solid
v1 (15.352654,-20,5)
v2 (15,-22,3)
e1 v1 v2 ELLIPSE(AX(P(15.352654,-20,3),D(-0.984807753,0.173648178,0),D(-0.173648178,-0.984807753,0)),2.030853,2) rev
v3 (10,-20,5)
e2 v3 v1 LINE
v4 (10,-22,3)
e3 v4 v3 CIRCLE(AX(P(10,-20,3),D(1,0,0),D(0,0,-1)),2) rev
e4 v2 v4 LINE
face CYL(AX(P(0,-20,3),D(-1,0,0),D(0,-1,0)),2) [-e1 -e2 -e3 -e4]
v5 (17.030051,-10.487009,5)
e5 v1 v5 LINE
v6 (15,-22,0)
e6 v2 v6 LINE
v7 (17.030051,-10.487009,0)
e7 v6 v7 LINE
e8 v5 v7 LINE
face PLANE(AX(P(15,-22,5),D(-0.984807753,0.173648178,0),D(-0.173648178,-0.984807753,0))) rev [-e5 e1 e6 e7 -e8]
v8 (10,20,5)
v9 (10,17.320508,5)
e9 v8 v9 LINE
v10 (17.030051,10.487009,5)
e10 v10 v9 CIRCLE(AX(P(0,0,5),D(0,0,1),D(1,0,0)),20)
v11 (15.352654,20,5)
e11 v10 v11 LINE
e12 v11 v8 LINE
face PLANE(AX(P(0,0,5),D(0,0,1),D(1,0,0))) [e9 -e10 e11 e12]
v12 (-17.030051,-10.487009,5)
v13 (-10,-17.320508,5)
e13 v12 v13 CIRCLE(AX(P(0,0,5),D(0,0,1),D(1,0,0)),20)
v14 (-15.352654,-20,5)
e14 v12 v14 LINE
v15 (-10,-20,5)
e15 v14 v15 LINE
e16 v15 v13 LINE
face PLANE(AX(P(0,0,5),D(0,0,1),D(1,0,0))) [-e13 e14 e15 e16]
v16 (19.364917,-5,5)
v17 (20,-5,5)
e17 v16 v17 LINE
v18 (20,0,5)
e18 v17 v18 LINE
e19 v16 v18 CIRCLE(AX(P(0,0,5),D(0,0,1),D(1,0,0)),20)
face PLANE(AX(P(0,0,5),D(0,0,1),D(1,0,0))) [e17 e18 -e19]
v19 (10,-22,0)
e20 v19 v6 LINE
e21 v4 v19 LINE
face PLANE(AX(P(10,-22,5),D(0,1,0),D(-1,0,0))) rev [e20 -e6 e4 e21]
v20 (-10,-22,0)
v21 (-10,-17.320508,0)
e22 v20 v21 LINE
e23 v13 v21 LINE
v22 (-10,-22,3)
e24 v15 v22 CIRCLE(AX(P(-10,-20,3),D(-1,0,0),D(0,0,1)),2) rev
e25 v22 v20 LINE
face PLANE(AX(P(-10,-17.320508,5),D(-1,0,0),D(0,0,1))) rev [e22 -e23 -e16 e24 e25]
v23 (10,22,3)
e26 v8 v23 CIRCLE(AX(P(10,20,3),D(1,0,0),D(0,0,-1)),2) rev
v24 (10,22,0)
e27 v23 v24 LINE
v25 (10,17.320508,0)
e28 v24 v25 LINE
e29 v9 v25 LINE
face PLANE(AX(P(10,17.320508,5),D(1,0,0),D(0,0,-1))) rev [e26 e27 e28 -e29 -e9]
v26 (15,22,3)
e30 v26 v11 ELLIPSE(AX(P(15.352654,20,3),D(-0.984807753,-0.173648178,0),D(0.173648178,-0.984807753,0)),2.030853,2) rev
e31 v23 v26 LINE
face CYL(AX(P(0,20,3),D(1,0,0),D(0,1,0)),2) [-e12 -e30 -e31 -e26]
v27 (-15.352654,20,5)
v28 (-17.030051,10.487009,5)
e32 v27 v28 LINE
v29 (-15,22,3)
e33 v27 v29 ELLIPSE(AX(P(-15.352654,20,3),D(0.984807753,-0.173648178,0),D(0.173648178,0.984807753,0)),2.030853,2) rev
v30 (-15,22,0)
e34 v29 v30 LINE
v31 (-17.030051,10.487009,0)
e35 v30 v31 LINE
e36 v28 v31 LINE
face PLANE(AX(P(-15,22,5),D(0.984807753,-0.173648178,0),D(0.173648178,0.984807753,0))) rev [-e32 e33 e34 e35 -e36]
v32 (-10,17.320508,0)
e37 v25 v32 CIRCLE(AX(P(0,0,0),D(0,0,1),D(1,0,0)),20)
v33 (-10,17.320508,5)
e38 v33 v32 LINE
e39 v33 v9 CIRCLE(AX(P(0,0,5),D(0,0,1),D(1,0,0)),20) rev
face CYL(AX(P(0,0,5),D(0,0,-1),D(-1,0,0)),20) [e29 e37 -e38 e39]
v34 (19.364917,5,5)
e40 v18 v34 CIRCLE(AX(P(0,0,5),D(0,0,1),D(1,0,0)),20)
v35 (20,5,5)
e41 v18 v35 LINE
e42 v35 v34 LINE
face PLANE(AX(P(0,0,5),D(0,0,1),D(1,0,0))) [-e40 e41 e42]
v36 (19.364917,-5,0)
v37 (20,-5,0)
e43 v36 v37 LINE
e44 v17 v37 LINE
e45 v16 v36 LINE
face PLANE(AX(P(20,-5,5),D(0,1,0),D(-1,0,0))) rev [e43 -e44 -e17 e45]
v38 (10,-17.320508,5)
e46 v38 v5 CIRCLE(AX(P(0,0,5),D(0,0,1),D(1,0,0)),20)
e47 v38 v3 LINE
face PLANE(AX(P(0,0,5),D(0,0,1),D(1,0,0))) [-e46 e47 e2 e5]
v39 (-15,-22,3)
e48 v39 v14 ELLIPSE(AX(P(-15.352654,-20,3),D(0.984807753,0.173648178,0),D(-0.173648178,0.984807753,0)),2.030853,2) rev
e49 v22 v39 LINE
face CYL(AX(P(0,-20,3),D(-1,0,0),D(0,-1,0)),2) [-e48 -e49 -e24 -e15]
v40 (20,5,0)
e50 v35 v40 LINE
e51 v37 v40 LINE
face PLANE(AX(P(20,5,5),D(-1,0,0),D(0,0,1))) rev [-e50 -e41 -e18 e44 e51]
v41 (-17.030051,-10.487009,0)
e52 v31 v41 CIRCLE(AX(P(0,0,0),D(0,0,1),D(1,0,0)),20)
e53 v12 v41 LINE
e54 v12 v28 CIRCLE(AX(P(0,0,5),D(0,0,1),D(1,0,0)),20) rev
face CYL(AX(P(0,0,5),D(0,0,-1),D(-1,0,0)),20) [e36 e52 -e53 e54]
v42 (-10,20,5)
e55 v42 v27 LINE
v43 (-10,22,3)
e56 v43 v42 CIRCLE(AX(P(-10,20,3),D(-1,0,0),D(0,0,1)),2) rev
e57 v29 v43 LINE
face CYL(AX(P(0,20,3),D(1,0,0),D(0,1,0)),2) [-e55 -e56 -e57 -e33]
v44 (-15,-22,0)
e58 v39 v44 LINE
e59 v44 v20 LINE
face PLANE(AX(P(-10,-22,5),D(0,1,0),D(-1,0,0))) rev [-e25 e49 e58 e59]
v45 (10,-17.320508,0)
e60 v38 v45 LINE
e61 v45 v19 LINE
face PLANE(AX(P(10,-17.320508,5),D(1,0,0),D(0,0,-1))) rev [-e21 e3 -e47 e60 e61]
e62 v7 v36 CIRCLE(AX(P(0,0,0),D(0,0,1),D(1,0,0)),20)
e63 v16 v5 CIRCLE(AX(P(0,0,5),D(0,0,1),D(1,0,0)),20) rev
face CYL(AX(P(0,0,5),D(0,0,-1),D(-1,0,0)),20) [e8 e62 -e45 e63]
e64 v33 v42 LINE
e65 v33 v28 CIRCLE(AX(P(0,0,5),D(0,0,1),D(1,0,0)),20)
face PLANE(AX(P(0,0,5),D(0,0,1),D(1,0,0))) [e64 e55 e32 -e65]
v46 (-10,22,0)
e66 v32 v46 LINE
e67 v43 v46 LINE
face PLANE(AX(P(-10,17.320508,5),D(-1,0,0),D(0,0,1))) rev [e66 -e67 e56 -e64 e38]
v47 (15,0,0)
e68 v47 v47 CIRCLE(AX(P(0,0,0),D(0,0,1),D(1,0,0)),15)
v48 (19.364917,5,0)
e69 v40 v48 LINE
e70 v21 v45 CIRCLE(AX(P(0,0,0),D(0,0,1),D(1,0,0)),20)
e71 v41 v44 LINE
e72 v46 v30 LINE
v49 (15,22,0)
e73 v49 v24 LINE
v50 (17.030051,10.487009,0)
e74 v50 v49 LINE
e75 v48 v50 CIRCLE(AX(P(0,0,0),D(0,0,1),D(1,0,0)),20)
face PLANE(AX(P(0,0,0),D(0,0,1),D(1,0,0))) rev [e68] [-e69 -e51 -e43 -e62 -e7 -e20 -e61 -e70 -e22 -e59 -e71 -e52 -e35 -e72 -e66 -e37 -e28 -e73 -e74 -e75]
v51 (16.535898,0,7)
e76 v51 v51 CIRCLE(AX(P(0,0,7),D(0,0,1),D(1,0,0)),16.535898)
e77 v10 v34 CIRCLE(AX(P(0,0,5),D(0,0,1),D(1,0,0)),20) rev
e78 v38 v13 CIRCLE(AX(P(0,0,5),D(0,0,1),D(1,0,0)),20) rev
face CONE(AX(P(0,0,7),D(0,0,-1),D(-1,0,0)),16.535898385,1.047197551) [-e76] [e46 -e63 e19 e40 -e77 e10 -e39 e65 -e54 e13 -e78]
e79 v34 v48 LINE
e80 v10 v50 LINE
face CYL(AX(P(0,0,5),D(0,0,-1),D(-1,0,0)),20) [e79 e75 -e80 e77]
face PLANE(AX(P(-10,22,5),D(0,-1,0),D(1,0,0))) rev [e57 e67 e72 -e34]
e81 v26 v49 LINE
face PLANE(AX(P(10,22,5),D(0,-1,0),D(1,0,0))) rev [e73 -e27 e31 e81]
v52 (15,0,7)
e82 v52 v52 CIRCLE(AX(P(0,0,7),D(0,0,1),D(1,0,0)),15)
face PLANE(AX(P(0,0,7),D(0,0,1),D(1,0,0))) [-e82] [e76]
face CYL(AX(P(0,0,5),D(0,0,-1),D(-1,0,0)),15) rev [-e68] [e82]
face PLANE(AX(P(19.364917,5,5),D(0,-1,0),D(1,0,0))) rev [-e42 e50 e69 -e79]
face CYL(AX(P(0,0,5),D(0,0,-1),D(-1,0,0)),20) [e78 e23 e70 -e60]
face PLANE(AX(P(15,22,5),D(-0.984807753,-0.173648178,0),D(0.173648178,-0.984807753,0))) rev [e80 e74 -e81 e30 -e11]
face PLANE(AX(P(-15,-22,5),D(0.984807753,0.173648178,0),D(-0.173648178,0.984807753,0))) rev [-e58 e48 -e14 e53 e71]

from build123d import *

# Parameters (mm, degrees)
ESQUISSE1_R        = 15
BOSS_EXTRU_1_DEPTH = 5
ESQUISSE5_R        = 20
ESQUISSE5_R_2      = 15
BOSS_EXTRU_2_DEPTH = 2
CHANFREIN2_SIZE    = 2
CHANFREIN2_SIZE_2  = 3.464101615
CONG_1_R           = 2


with BuildPart() as part:
    # Esquisse1 → Boss.-Extru.1 (new body)
    with BuildSketch(Plane.XY):
        with BuildLine():
            Line((-10, 17.320508076), (-10, 22))
            Line((-10, 22), (-15, 22))
            Line((-15, 22), (-17.030050858, 10.487009478))
            ThreePointArc((-17.030050858, 10.487009478), (-20, 0), (-17.030050858, -10.487009478))
            Line((-17.030050858, -10.487009478), (-15, -22))
            Line((-15, -22), (-10, -22))
            Line((-10, -22), (-10, -17.320508076))
            ThreePointArc((-10, -17.320508076), (0, -20), (10, -17.320508076))
            Line((10, -17.320508076), (10, -22))
            Line((10, -22), (15, -22))
            Line((15, -22), (17.030050858, -10.487009478))
            ThreePointArc((17.030050858, -10.487009478), (18.403131111, -7.831013044), (19.364916731, -5))
            Line((19.364916731, -5), (20, -5))
            Line((20, -5), (20, 5))
            Line((20, 5), (19.364916731, 5))
            ThreePointArc((19.364916731, 5), (18.403131111, 7.831013044), (17.030050858, 10.487009478))
            Line((17.030050858, 10.487009478), (15, 22))
            Line((15, 22), (10, 22))
            Line((10, 22), (10, 17.320508076))
            ThreePointArc((10, 17.320508076), (0, 20), (-10, 17.320508076))
        make_face()
        Circle(ESQUISSE1_R, mode=Mode.SUBTRACT)
    extrude(amount=BOSS_EXTRU_1_DEPTH)

    # Esquisse5 → Boss.-Extru.2 (add)
    with BuildSketch(Plane.XY.offset(5)):
        Circle(ESQUISSE5_R)
        Circle(ESQUISSE5_R_2, mode=Mode.SUBTRACT)
    extrude(amount=BOSS_EXTRU_2_DEPTH)

    # Chanfrein2
    # the kernel refuses this chamfer: 3.464101615, 2 mm, written as the material it takes off along each edge
    with BuildSketch(Plane(origin=(0, 0, 7), x_dir=(1, 0, 0), z_dir=(0, -1, 0))) as chanfrein2_piece_1:
        Polygon((20, -CHANFREIN2_SIZE), (20 - CHANFREIN2_SIZE_2, 0), (20, 0), align=None)
    revolve(axis=Axis((0, 0, 7), (0, 0, 1)), mode=Mode.SUBTRACT)

    # Congé1
    cong_1_edges = [part.edges().sort_by_distance(p)[0] for p in [
        (12.5, -22, 5),
        (-12.5, -22, 5),
        (12.5, 22, 5),
        (-12.5, 22, 5),
    ]]
    fillet(cong_1_edges, radius=CONG_1_R)


solid = part.part
